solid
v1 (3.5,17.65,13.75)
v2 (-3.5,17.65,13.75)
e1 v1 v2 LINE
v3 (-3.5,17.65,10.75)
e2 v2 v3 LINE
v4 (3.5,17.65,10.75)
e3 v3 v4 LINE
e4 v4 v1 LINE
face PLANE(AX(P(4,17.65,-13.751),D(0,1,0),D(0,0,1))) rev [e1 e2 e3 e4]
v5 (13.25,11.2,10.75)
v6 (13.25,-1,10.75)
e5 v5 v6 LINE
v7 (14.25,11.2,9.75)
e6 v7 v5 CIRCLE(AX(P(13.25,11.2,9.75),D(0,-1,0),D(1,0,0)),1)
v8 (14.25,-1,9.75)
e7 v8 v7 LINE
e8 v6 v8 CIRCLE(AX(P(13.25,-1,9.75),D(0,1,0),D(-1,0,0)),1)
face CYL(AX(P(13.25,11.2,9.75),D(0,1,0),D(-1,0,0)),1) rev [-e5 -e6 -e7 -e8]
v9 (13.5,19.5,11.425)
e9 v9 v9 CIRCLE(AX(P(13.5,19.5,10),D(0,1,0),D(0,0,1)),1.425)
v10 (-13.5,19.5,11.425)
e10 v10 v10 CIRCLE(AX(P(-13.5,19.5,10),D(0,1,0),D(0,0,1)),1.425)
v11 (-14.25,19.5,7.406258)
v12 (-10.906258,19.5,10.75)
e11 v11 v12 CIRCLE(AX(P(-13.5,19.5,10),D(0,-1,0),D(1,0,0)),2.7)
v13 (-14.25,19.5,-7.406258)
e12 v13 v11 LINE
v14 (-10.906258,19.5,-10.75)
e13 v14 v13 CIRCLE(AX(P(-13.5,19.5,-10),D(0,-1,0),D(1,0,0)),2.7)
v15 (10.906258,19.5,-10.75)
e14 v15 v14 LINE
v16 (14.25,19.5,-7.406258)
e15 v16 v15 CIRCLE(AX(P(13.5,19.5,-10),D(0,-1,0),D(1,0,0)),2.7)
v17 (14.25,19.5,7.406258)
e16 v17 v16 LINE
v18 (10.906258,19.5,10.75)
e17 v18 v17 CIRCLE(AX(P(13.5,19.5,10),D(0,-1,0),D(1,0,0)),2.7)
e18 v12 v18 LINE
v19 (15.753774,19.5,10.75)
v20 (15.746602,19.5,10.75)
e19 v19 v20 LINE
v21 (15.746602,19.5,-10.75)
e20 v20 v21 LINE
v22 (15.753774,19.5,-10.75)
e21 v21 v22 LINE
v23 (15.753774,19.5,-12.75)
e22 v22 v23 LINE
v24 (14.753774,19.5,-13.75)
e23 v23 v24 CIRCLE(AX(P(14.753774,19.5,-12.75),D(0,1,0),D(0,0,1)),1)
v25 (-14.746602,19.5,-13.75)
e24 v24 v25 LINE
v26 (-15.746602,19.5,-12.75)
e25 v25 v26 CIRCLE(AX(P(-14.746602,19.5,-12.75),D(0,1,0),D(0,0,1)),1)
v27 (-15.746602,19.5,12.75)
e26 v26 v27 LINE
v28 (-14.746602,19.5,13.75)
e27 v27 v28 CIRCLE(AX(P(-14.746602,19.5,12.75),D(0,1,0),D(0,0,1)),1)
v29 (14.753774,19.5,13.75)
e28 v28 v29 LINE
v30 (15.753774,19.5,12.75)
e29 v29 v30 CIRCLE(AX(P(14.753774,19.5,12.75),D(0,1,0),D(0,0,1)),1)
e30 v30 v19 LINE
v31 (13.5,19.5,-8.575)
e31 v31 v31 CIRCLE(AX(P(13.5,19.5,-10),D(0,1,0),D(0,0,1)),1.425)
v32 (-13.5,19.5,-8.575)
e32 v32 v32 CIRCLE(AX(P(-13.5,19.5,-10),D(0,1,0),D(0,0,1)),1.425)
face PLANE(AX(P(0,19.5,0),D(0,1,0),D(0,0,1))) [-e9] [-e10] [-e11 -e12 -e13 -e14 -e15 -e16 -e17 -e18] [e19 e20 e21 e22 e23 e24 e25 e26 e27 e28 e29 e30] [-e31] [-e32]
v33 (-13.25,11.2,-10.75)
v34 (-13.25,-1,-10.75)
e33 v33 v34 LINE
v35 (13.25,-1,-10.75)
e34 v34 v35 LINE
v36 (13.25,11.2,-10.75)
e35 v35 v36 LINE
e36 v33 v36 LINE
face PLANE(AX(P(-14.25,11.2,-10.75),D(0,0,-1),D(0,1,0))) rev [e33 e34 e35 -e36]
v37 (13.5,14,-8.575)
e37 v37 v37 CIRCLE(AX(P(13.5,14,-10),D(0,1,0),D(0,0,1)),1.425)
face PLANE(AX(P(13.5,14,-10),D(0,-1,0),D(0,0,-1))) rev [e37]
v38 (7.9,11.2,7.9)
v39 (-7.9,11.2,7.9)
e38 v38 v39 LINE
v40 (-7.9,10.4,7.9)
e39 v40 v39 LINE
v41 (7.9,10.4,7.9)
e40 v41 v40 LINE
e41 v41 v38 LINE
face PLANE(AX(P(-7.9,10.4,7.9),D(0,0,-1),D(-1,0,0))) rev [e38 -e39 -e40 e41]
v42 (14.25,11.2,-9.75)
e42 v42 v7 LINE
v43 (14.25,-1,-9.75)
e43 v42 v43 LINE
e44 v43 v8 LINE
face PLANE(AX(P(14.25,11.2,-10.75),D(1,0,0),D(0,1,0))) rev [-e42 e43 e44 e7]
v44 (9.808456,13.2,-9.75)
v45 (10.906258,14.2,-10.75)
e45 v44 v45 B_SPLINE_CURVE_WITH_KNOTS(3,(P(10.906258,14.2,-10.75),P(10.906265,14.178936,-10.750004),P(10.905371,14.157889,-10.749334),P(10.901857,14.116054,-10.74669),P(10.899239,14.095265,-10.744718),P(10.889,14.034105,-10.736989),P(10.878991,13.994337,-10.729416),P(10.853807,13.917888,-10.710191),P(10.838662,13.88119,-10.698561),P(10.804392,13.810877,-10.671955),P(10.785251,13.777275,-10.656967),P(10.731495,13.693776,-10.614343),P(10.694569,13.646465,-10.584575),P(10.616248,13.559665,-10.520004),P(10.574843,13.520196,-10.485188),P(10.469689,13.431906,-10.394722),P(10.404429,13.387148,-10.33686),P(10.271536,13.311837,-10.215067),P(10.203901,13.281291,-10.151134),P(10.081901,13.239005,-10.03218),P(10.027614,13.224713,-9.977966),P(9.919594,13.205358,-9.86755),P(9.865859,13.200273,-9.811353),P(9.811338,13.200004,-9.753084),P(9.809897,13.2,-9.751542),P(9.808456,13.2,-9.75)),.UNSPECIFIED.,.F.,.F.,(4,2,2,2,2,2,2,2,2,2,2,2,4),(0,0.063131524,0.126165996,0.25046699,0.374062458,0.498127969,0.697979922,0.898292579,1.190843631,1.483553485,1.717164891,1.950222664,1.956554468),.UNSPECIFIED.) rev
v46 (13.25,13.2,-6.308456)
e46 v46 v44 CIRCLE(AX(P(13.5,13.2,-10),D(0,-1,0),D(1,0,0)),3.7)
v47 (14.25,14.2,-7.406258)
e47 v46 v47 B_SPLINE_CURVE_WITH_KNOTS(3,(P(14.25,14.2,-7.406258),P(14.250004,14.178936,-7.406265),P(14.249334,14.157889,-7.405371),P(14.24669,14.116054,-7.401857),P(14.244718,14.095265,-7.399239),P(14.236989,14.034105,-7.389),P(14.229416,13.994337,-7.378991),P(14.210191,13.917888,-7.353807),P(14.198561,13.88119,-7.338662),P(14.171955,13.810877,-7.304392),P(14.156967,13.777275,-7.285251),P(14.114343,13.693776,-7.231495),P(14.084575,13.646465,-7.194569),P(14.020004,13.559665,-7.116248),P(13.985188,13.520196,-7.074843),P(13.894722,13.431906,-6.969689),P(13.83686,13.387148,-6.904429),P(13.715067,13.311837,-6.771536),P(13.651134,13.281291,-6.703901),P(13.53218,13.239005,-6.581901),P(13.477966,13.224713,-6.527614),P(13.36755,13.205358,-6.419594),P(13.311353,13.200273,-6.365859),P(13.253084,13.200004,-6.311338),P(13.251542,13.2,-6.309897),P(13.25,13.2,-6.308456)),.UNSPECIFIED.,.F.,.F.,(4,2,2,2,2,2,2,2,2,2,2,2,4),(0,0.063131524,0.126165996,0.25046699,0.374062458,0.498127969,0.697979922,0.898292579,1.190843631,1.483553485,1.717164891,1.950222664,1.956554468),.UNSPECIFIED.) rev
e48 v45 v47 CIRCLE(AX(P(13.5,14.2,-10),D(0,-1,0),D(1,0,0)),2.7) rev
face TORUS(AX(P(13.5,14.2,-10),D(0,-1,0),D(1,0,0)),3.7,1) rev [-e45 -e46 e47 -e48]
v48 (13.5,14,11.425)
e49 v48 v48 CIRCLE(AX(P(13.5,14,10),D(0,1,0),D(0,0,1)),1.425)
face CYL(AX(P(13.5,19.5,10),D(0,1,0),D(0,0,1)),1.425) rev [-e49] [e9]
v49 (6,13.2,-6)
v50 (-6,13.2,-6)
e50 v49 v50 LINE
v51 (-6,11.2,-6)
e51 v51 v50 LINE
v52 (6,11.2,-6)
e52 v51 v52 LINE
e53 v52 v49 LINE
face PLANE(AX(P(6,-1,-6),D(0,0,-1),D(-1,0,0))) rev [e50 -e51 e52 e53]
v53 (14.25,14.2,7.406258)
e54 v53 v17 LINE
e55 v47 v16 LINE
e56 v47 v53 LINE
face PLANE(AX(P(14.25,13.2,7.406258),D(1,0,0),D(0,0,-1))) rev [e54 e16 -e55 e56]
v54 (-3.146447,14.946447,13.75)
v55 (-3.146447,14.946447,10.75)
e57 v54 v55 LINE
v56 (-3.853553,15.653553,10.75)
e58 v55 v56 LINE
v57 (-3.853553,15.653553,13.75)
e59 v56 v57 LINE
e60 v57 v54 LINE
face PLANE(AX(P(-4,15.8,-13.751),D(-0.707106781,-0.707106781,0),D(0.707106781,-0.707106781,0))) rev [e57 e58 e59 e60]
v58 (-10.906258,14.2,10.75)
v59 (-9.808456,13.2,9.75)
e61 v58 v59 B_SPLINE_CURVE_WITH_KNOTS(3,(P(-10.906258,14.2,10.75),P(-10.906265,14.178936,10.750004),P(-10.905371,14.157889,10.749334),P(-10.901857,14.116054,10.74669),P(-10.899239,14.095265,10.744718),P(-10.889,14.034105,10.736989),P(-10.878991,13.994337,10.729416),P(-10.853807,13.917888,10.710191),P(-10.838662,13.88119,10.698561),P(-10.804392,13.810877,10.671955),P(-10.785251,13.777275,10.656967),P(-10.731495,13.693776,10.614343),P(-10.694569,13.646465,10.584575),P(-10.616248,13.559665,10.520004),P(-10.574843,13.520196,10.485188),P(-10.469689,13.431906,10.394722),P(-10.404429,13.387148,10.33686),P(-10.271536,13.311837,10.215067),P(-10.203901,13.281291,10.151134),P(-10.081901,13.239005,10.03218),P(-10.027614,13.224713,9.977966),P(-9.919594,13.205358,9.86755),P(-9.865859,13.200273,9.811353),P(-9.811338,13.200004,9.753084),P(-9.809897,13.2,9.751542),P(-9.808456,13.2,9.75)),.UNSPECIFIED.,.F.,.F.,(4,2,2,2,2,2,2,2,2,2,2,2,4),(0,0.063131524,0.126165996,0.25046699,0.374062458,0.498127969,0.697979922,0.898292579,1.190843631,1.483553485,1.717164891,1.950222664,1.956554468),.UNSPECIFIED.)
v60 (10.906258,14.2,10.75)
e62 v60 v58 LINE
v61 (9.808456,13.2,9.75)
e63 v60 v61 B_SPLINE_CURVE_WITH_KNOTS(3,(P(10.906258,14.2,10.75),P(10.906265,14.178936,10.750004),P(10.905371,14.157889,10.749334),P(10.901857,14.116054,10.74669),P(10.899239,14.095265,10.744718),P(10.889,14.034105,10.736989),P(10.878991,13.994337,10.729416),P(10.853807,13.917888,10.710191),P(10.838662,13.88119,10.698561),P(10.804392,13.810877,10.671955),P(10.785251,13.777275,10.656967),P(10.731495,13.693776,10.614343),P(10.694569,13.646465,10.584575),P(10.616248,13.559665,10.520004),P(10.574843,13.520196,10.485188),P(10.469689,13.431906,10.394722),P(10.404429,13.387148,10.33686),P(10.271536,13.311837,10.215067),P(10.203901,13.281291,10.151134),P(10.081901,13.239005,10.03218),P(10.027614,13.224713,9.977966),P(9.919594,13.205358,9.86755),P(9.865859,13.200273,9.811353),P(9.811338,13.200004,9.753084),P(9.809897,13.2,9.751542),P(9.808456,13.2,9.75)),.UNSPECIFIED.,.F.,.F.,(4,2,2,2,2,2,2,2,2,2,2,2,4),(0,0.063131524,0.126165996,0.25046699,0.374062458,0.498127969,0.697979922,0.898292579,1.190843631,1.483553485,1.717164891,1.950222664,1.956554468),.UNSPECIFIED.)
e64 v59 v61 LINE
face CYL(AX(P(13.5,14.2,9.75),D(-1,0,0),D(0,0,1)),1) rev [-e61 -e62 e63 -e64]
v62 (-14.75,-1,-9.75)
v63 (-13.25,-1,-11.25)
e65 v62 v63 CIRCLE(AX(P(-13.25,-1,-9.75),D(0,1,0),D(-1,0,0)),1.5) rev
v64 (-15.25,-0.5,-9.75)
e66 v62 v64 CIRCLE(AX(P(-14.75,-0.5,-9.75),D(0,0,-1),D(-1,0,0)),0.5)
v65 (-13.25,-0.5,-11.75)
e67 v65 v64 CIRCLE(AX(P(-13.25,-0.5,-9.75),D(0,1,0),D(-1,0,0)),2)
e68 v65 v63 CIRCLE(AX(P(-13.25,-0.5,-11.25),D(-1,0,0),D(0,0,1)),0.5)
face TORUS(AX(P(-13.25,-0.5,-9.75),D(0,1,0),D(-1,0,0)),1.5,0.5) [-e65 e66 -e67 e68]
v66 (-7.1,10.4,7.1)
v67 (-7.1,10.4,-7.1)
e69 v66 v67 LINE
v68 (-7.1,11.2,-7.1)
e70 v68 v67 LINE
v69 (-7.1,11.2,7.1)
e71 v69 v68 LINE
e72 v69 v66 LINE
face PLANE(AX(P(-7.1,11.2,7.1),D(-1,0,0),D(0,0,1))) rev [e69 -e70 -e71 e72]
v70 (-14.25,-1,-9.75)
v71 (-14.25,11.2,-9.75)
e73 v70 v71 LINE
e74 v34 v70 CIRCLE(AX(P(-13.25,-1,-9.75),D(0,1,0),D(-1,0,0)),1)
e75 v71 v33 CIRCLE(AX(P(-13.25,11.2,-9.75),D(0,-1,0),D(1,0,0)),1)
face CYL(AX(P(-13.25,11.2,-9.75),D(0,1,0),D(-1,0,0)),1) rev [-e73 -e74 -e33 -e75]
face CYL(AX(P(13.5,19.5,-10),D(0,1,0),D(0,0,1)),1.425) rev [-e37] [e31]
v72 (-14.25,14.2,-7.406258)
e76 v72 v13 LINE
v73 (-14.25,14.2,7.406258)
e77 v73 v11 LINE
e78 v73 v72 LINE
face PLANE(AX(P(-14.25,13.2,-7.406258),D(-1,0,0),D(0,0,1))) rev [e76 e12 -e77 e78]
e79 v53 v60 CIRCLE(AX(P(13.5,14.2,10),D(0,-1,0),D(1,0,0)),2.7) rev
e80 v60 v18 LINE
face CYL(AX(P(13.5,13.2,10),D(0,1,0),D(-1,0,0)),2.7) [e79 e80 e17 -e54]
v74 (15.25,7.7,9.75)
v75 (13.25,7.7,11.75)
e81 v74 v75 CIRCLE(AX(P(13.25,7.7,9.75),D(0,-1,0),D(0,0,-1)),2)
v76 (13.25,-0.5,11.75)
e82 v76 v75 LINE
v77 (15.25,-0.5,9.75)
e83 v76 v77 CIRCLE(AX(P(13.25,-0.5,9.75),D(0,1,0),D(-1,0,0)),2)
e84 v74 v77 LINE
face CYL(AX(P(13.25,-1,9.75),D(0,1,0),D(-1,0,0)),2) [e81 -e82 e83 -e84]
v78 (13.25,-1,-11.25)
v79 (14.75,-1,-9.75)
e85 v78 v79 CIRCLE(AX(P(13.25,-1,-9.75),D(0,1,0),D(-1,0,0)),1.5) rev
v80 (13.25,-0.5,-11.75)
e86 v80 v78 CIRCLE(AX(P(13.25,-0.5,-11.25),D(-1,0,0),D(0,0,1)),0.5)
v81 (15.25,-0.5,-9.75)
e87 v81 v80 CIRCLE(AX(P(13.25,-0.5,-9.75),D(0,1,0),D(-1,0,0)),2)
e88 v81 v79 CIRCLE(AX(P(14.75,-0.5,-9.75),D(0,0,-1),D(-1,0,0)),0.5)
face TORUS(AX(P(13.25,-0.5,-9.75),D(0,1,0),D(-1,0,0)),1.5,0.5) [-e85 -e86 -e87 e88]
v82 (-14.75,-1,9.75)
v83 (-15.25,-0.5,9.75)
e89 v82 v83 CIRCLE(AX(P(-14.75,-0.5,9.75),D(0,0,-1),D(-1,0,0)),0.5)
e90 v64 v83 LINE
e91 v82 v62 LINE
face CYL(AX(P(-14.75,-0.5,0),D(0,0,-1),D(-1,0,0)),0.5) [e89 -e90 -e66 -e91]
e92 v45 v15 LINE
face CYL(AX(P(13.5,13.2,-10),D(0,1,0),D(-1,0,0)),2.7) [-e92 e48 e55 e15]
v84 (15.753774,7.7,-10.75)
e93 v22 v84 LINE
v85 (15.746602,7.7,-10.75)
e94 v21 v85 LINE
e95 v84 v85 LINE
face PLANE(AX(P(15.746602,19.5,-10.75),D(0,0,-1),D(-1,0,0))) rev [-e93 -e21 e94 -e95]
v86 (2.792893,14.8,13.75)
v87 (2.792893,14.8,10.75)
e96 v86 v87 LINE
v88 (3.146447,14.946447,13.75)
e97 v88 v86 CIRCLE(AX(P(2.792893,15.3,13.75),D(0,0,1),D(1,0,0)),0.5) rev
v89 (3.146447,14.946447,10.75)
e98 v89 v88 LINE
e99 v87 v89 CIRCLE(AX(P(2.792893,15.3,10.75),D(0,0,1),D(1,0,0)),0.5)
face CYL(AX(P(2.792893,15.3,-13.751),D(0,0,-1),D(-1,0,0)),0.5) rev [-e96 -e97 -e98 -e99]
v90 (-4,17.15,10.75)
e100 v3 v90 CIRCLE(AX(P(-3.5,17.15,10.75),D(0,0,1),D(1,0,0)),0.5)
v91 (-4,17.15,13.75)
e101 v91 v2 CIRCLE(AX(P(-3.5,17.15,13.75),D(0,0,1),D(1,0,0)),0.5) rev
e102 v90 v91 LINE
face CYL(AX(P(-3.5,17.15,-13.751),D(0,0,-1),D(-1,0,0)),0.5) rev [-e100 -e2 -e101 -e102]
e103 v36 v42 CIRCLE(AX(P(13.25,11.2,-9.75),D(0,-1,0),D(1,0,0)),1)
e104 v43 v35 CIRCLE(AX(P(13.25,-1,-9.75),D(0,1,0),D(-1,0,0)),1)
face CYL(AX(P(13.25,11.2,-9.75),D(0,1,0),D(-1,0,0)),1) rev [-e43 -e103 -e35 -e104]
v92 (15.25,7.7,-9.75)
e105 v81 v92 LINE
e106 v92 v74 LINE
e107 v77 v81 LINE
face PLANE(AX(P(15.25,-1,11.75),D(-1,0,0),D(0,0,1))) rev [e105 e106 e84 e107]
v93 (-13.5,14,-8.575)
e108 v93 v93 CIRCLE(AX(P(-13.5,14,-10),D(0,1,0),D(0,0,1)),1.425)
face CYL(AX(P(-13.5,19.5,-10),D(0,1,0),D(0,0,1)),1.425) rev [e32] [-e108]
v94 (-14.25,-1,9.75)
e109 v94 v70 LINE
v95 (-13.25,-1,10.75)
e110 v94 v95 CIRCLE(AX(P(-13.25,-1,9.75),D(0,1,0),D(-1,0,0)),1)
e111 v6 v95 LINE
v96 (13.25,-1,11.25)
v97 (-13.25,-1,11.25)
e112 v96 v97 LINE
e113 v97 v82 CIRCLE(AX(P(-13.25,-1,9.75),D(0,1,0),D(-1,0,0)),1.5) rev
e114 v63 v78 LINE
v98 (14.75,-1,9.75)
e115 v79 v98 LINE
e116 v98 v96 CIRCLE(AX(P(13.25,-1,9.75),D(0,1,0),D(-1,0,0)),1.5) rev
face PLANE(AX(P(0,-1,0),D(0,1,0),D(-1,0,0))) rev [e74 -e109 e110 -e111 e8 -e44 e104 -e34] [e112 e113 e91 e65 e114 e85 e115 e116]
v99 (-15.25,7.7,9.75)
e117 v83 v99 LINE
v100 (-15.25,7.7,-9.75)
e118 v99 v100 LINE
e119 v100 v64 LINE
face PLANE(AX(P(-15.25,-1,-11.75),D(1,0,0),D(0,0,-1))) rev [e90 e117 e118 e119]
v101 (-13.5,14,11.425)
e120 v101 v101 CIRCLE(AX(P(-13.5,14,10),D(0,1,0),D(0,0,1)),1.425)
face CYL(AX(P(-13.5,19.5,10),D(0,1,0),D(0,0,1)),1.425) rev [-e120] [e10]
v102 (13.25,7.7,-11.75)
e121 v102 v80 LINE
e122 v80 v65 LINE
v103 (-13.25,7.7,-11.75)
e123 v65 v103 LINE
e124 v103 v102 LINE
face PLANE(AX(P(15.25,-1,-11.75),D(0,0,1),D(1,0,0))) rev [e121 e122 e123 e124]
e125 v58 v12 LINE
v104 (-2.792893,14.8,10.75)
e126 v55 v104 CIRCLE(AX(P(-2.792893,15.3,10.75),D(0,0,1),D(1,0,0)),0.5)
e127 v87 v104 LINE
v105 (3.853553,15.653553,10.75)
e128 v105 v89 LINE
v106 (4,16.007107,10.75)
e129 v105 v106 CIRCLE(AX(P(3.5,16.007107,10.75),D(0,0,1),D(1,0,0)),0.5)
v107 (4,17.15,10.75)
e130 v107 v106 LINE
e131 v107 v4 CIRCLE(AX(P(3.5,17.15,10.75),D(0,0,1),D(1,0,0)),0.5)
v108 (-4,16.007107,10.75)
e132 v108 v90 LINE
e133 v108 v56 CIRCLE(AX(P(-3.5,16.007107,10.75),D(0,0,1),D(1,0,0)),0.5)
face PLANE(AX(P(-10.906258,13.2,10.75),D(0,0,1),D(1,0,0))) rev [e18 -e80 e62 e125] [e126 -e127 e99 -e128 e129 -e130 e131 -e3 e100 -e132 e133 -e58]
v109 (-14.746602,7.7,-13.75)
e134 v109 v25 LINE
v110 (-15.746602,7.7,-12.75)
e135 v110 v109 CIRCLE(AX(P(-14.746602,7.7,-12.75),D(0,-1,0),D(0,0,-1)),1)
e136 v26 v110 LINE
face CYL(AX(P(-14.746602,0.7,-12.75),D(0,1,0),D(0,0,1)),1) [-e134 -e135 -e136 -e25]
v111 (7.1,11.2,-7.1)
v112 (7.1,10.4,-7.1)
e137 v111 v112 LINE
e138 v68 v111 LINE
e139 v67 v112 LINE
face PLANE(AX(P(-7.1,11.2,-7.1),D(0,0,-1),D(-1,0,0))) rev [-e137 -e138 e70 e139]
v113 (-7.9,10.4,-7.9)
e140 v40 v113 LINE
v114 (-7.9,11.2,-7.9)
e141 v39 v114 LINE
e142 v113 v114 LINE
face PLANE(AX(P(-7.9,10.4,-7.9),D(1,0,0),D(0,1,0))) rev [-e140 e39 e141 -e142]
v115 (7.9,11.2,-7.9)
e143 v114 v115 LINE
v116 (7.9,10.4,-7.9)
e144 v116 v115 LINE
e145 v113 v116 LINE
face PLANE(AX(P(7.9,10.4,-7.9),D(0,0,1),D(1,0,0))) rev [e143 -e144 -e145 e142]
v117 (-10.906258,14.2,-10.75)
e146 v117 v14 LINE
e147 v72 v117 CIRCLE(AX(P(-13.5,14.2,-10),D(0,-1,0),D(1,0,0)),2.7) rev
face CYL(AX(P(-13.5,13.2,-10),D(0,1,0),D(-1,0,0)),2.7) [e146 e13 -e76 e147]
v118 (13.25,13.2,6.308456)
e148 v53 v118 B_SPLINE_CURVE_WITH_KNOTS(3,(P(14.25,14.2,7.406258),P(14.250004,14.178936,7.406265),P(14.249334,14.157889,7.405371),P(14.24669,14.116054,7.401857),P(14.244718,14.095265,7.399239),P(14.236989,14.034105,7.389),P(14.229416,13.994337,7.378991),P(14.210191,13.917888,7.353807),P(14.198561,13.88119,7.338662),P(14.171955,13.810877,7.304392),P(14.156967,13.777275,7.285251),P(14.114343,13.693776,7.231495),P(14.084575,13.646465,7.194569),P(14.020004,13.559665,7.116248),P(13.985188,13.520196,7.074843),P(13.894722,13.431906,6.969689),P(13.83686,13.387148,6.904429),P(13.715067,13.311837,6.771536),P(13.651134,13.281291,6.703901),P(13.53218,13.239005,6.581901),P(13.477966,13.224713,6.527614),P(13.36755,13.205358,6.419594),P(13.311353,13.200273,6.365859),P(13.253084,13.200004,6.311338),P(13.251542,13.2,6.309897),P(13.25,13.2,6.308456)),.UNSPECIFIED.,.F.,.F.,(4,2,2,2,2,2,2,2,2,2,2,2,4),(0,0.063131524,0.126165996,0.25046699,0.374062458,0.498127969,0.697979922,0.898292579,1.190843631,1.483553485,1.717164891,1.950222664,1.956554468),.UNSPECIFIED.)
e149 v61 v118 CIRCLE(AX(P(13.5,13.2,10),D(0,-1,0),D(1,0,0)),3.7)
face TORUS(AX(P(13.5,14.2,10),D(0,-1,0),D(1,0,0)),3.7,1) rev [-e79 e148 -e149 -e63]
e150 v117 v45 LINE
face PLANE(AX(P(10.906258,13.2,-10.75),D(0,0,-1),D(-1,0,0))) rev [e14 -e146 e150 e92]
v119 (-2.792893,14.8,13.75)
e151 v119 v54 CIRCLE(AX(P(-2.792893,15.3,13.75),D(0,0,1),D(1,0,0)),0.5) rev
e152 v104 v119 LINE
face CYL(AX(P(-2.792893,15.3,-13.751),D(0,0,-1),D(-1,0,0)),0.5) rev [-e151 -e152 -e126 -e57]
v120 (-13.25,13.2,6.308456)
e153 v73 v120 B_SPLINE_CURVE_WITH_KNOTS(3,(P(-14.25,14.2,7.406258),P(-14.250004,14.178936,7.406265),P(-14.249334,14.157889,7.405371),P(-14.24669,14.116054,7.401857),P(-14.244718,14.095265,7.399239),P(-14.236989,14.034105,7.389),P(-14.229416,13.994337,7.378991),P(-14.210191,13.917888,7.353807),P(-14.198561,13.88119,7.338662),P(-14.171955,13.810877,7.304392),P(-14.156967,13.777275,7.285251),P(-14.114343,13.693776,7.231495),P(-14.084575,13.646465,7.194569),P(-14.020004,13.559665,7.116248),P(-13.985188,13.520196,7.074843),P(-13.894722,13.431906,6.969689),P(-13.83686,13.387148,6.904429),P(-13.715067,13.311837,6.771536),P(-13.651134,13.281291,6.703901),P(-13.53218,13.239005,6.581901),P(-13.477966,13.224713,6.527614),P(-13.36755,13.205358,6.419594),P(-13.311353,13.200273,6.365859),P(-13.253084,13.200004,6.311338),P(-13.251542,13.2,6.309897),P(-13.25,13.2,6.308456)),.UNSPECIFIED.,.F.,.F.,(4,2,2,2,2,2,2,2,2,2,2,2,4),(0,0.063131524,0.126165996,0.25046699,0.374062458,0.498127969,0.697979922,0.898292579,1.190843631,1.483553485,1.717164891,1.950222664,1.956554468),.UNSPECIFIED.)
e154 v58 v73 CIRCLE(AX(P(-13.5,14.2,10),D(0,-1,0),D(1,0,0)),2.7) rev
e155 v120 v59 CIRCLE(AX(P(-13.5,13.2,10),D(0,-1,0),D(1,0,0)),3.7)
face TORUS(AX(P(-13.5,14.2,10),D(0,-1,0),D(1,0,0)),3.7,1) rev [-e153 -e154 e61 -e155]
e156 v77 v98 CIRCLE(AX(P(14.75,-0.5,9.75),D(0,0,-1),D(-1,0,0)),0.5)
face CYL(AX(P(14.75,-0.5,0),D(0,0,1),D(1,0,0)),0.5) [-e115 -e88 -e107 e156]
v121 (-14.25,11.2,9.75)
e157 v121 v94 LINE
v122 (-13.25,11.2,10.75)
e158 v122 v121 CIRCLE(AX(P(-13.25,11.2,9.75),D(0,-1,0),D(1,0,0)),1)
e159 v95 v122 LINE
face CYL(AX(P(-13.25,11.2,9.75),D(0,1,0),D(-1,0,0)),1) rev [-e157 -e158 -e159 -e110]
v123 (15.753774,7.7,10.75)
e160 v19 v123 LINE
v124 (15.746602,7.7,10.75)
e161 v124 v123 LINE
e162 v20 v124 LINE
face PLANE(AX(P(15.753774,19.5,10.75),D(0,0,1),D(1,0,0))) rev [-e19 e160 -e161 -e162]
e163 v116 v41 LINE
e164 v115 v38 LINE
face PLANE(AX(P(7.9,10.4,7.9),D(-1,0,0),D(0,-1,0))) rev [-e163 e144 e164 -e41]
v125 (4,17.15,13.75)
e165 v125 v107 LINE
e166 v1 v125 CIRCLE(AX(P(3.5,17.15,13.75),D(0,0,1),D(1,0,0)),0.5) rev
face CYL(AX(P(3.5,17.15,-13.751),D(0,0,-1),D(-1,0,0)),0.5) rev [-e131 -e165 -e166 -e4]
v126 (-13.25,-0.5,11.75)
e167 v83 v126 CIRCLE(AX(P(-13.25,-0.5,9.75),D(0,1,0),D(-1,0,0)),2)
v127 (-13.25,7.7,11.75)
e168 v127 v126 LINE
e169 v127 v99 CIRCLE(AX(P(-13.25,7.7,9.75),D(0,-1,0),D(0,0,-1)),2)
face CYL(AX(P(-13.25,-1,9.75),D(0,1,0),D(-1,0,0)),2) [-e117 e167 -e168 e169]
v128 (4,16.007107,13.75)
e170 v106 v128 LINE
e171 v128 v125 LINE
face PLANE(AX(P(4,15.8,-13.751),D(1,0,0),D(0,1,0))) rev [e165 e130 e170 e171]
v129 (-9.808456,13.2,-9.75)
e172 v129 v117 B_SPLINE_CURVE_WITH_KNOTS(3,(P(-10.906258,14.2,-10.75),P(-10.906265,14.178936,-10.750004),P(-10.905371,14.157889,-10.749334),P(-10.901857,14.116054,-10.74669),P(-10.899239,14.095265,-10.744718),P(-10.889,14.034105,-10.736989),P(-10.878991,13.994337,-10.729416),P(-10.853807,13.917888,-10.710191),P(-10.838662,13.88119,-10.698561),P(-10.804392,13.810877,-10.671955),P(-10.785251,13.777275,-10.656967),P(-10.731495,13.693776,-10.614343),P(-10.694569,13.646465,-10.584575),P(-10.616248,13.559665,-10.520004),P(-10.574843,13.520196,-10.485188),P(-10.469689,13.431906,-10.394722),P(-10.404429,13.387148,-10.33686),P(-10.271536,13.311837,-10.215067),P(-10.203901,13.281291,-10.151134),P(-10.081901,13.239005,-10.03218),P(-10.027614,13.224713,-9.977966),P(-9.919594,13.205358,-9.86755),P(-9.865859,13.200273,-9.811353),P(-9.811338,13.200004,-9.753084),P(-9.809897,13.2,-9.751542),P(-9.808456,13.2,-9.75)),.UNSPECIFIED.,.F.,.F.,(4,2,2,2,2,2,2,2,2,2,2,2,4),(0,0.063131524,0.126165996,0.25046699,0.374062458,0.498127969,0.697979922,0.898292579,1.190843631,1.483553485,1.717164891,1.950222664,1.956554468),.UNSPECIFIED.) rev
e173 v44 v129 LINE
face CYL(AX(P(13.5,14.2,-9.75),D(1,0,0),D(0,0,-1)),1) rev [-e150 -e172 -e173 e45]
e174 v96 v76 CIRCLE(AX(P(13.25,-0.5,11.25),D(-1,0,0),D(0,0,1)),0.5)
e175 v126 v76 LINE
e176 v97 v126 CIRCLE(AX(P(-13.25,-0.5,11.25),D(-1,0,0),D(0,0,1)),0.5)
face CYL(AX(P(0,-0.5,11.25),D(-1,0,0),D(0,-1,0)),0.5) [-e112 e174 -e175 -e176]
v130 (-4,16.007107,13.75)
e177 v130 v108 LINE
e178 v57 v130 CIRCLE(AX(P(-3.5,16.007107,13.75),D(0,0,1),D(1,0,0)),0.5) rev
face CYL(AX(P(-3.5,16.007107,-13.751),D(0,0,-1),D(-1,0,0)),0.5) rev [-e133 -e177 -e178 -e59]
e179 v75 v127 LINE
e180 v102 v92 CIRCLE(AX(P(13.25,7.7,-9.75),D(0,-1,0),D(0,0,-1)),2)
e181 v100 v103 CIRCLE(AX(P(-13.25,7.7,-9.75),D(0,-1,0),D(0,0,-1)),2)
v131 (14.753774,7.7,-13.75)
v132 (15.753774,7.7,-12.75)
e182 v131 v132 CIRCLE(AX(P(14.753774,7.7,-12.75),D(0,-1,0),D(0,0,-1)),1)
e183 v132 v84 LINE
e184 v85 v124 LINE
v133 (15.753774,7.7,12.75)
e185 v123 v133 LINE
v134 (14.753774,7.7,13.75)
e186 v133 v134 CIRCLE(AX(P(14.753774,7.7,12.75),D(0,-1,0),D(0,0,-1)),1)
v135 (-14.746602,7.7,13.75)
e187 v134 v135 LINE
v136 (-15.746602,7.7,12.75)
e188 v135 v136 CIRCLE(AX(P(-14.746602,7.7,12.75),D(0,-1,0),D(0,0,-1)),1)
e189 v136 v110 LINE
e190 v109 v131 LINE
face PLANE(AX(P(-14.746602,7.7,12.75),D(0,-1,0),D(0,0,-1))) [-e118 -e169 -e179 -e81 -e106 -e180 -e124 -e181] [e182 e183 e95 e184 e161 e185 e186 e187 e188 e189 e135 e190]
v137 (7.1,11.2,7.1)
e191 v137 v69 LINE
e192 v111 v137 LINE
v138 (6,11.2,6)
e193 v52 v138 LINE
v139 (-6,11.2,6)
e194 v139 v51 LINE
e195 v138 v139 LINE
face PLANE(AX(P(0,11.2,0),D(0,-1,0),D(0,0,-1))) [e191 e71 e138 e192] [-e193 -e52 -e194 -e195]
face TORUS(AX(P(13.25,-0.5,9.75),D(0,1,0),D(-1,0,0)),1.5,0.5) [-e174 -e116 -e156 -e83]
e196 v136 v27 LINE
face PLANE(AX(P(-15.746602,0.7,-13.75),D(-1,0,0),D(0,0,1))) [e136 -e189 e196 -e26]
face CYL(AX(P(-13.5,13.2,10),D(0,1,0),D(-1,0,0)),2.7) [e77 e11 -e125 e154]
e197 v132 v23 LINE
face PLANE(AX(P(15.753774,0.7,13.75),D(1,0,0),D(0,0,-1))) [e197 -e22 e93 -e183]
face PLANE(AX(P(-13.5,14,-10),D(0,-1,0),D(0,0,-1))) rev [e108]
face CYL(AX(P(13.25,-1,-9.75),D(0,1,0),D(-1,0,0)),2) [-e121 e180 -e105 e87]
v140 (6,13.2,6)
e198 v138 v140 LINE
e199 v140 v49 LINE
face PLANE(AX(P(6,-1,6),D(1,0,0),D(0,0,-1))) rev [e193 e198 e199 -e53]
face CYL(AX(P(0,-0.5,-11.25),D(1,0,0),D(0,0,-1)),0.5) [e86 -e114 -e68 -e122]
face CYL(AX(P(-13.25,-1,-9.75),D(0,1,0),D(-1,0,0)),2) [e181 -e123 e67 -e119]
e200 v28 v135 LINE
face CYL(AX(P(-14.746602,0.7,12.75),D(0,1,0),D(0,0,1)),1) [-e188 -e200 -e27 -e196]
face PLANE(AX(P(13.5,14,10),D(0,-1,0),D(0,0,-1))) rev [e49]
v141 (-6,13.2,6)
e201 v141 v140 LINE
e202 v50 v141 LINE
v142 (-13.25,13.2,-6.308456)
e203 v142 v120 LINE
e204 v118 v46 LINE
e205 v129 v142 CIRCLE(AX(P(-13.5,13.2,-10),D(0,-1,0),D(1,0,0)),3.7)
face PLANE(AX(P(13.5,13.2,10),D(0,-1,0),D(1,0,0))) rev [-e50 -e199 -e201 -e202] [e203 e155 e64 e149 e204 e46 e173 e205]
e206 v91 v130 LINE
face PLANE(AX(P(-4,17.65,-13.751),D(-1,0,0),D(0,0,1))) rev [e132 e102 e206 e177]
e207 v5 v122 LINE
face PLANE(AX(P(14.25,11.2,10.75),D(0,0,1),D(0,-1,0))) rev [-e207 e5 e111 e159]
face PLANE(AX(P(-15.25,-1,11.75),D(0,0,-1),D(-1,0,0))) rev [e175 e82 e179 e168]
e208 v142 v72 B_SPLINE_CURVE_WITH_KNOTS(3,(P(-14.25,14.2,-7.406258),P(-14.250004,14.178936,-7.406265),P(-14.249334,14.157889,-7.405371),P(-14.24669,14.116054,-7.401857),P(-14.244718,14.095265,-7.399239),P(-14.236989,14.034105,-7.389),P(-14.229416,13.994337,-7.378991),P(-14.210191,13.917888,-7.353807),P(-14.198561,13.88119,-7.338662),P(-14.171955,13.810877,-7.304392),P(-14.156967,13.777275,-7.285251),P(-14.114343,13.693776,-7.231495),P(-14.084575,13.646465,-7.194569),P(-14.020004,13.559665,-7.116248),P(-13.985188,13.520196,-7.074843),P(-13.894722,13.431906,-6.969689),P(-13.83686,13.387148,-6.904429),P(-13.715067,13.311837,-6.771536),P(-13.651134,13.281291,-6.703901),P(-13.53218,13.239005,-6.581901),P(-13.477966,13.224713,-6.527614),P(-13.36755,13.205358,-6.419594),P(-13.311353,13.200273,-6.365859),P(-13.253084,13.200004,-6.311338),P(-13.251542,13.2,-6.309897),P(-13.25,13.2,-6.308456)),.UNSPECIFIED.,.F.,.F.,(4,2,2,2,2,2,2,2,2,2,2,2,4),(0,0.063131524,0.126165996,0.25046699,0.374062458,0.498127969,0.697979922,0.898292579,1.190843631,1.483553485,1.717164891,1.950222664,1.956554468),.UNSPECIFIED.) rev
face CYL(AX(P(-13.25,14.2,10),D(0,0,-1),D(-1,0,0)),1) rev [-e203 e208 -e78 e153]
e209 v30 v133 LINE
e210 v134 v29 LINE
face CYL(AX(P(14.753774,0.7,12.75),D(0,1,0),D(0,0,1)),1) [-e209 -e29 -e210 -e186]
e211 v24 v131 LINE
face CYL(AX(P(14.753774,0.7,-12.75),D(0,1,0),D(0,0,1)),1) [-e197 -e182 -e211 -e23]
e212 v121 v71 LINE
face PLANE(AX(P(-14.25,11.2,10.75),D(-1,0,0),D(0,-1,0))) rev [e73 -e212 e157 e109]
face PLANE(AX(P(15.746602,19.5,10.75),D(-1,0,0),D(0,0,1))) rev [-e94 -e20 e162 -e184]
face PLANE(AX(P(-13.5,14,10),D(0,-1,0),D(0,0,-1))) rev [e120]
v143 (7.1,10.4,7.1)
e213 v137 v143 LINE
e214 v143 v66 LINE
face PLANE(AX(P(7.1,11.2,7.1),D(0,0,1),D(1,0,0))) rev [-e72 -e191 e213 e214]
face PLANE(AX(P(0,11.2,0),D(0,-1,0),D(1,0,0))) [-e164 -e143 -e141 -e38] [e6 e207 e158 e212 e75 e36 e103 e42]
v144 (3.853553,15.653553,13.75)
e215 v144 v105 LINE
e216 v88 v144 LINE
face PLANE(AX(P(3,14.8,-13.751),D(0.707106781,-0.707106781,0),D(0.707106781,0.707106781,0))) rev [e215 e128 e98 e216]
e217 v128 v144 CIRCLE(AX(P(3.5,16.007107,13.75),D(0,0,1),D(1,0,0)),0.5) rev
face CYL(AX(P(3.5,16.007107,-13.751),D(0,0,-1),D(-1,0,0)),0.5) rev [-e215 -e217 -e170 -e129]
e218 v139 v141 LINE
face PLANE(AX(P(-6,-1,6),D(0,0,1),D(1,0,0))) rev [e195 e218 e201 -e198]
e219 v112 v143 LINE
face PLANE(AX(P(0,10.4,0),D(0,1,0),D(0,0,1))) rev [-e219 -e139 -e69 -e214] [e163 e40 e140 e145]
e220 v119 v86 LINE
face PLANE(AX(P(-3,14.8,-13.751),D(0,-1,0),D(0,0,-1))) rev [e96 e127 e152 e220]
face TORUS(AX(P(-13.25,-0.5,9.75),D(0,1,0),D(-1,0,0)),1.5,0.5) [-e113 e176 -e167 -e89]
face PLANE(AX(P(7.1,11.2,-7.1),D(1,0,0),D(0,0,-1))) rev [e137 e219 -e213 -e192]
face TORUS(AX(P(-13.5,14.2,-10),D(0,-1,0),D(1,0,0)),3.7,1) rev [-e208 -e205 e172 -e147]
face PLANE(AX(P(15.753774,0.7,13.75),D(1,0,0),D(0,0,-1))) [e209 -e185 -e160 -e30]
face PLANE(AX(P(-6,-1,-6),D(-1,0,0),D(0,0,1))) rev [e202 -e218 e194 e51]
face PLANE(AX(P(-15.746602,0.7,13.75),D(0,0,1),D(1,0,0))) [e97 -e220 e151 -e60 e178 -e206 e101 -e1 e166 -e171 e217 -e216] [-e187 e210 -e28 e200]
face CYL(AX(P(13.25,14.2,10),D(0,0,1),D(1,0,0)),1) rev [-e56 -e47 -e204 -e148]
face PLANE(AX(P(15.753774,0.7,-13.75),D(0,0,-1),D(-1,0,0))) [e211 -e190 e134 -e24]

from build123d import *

# Parameters (mm, degrees)
SKETCH_1_W               = 31.500375693
SKETCH_1_H               = 27.5
EXTRUDE_1_DEPTH          = 18.8
SKETCH_2_W               = 0.007172267
SKETCH_2_H               = 21.5
CUT_EXTRUDE_1_DEPTH      = 18.8
SKETCH_3_W               = 30.5
SKETCH_3_H               = 23.5
EXTRUDE_2_DEPTH          = 1.7
SKETCH_4_W               = 28.5
SKETCH_4_H               = 21.5
CUT_EXTRUDE_2_DEPTH      = 12.2
SKETCH_5_W               = 15.8
SKETCH_5_H               = 15.8
EXTRUDE_3_DEPTH          = 0.8
CUT_EXTRUDE_3_DEPTH      = 6.3
SKETCH_7_W               = 14.2
SKETCH_7_H               = 14.2
CUT_EXTRUDE_4_DEPTH      = 0.8
SKETCH_8_W               = 12
SKETCH_8_H               = 12
CUT_EXTRUDE_5_DEPTH      = 26.276152686
CUT_EXTRUDE_6_REACH      = 39.211
HOLE_WIZARD_M2_5_1_D     = 2.85
HOLE_WIZARD_M2_5_1_DEPTH = 5.5
FILLET_1_R               = 2
FILLET_2_R               = 0.5
FILLET_3_R               = 1
CUT_EXTRUDE_8_DEPTH      = 7


with BuildPart() as part:
    # 草图1 → 凸台-拉伸1 (new body)
    with BuildSketch(Plane(origin=(0, 19.5, 0), x_dir=(1, 0, 0), z_dir=(0, 1, 0))):
        with Locations((0.003586134, 0)):
            Rectangle(SKETCH_1_W, SKETCH_1_H)
    extrude(amount=-EXTRUDE_1_DEPTH)

    # 草图2 → 切除-拉伸1 (cut)
    with BuildSketch(Plane.XZ.offset(-0.7)):
        with Locations((15.750187847, 0)):
            Rectangle(SKETCH_2_W, SKETCH_2_H)
    extrude(amount=-CUT_EXTRUDE_1_DEPTH, mode=Mode.SUBTRACT)

    # 草图3 → 凸台-拉伸2 (add)
    with BuildSketch(Plane.XZ.offset(-0.7)):
        Rectangle(SKETCH_3_W, SKETCH_3_H)
    extrude(amount=EXTRUDE_2_DEPTH)

    # 草图4 → 切除-拉伸2 (cut)
    with BuildSketch(Plane.XZ.offset(1)):
        Rectangle(SKETCH_4_W, SKETCH_4_H)
    extrude(amount=-CUT_EXTRUDE_2_DEPTH, mode=Mode.SUBTRACT)

    # 草图5 → 凸台-拉伸3 (add)
    with BuildSketch(Plane.XZ.offset(-11.2)):
        Rectangle(SKETCH_5_W, SKETCH_5_H)
    extrude(amount=EXTRUDE_3_DEPTH)

    # 草图6 → 切除-拉伸3 (cut)
    with BuildSketch(Plane(origin=(0, 19.5, 0), x_dir=(-1, 0, 0), z_dir=(0, 1, 0))):
        with BuildLine():
            Line((-14.25, 7.40625753), (-14.25, -7.40625753))
            ThreePointArc((-14.25, -7.40625753), (-11.590811691, -8.090811691), (-10.90625753, -10.75))
            Line((-10.90625753, -10.75), (10.90625753, -10.75))
            ThreePointArc((10.90625753, -10.75), (11.590811691, -8.090811691), (14.25, -7.40625753))
            Line((14.25, -7.40625753), (14.25, 7.40625753))
            ThreePointArc((14.25, 7.40625753), (11.590811691, 8.090811691), (10.90625753, 10.75))
            Line((10.90625753, 10.75), (-10.90625753, 10.75))
            ThreePointArc((-10.90625753, 10.75), (-11.590811691, 8.090811691), (-14.25, 7.40625753))
        make_face()
    extrude(amount=-CUT_EXTRUDE_3_DEPTH, mode=Mode.SUBTRACT)

    # 草图7 → 切除-拉伸4 (cut)
    with BuildSketch(Plane.XZ.offset(-10.4)):
        Rectangle(SKETCH_7_W, SKETCH_7_H)
    extrude(amount=-CUT_EXTRUDE_4_DEPTH, mode=Mode.SUBTRACT)

    # 草图8 → 切除-拉伸5 (cut, through all)
    with BuildSketch(Plane(origin=(0, 13.2, 0), x_dir=(-1, 0, 0), z_dir=(0, 1, 0))):
        Rectangle(SKETCH_8_W, SKETCH_8_H)
    extrude(amount=-CUT_EXTRUDE_5_DEPTH, mode=Mode.SUBTRACT)

    # 草图9 → 切除-拉伸6 (cut, up to next)
    with BuildSketch(Plane.XY.offset(13.75), mode=Mode.PRIVATE) as cut_extrude_6_sk1:
        Polygon((-4, 17.65), (-4, 15.8), (-3, 14.8), (3, 14.8), (4, 15.8), (4, 17.65), align=None)
    cut_extrude_6_tool1 = extrude(cut_extrude_6_sk1.sketch, amount=-CUT_EXTRUDE_6_REACH, mode=Mode.PRIVATE) & part.part
    add(cut_extrude_6_tool1.solids().sort_by_distance((0, 16.275076, 13.75))[0], mode=Mode.SUBTRACT)

    # M2.5 间隙孔1
    with Locations(Plane(origin=(0, 19.5, 0), x_dir=(1, 0, 0), z_dir=(0, 1, 0))):
        with Locations((13.5, 10), (13.5, -10), (-13.5, -10), (-13.5, 10)):
            Hole(HOLE_WIZARD_M2_5_1_D / 2, depth=HOLE_WIZARD_M2_5_1_DEPTH)

    # 圆角1
    fillet_1_edges = [part.edges().sort_by_distance(p)[0] for p in [
        (15.25, -0.15, -11.75),
        (15.25, -0.15, 11.75),
        (-15.25, -0.15, 11.75),
        (-15.25, -0.15, -11.75),
    ]]
    fillet(fillet_1_edges, radius=FILLET_1_R)

    # 圆角2
    fillet_2_edges = [part.edges().sort_by_distance(p)[0] for p in [
        (-4, 17.65, 12.25),
        (4, 17.65, 12.25),
        (4, 15.8, 12.25),
        (3, 14.8, 12.25),
        (-3, 14.8, 12.25),
        (-4, 15.8, 12.25),
        (-15.25, -1, 0),
        (0, -1, 11.75),
        (15.25, -1, 0),
        (0, -1, -11.75),
        (14.664213562, -1, -11.164213562),
        (-14.664213562, -1, -11.164213562),
        (14.664213562, -1, 11.164213562),
        (-14.664213562, -1, 11.164213562),
    ]]
    fillet(fillet_2_edges, radius=FILLET_2_R)

    # 圆角3
    # the kernel refuses this fillet: 1 mm, written as the material it adds along each edge
    with BuildSketch(Plane(origin=(-14.25, -1, 10.75), x_dir=(1, 0, 0), z_dir=(0, 1, 0))) as fillet_3_piece_1:
        with BuildLine():
            CenterArc((FILLET_3_R, FILLET_3_R), FILLET_3_R, 180, 90)
            Line((0, FILLET_3_R), (0, 0))
            Line((0, 0), (FILLET_3_R, 0))
        make_face()
    extrude(amount=14.7)
    with BuildSketch(Plane(origin=(14.25, -1, 10.75), x_dir=(-1, 0, 0), z_dir=(0, 1, 0)), Plane(origin=(14.25, -1, -10.75), x_dir=(0, 0, 1), z_dir=(0, 1, 0)), Plane(origin=(-14.25, -1, -10.75), x_dir=(1, 0, 0), z_dir=(0, 1, 0))) as fillet_3_piece_2:
        with BuildLine():
            CenterArc((FILLET_3_R, -FILLET_3_R), FILLET_3_R, 90, 90)
            Line((0, -FILLET_3_R), (0, 0))
            Line((0, 0), (FILLET_3_R, 0))
        make_face()
    extrude(amount=14.7)
    with BuildSketch(Plane(origin=(13.5, 13.2, 10), x_dir=(-0.3548034469093428, 0, 0.9349409147434126), z_dir=(0.9349409147434126, 0, 0.3548034469093428))) as fillet_3_piece_3_section:
        with BuildLine():
            CenterArc((2.7 + FILLET_3_R, -FILLET_3_R), FILLET_3_R, 90, 90)
            Line((2.7 + FILLET_3_R, 0), (2.7, 0))
            Line((2.7, 0), (2.7, -FILLET_3_R))
        make_face()
    fillet_3_piece_3 = revolve(axis=Axis((13.5, 13.2, 10), (0, -1, 0)), revolution_arc=228.43720284, mode=Mode.PRIVATE)
    fillet_3_piece_3 = split(fillet_3_piece_3, bisect_by=Plane(origin=(14.25, 13.485154119, 7.889177279), z_dir=(-1, 0, 0)), keep=Keep.TOP, mode=Mode.PRIVATE)
    add(fillet_3_piece_3)
    with BuildSketch(Plane(origin=(-13.40625753, 13.2, 10.75), x_dir=(0, 1, 0), z_dir=(1, 0, 0))) as fillet_3_piece_4_section:
        with BuildLine():
            CenterArc((FILLET_3_R, -FILLET_3_R), FILLET_3_R, 90, 90)
            Line((0, -FILLET_3_R), (0, 0))
            Line((0, 0), (FILLET_3_R, 0))
        make_face()
    fillet_3_piece_4 = extrude(amount=26.81251506, mode=Mode.PRIVATE)
    fillet_3_piece_4 = fillet_3_piece_4 - Plane(origin=(13.5, 14.049901013, 10), x_dir=(-0.9606453592105874, 0, 0.27777777777777996), z_dir=(0, 1, 0)) * Cylinder(2.7, 58, mode=Mode.PRIVATE)
    fillet_3_piece_4 = fillet_3_piece_4 - Plane(origin=(-13.5, 14.049901013, 10), x_dir=(-0.2777777777777764, 0, -0.9606453592105884), z_dir=(0, 1, 0)) * Cylinder(2.7, 58, mode=Mode.PRIVATE)
    add(fillet_3_piece_4)
    with BuildSketch(Plane(origin=(-13.5, 13.2, 10), x_dir=(-0.9349409147434112, 0, -0.35480344690934623), z_dir=(-0.35480344690934623, 0, 0.9349409147434112))) as fillet_3_piece_5_section:
        with BuildLine():
            CenterArc((2.7 + FILLET_3_R, -FILLET_3_R), FILLET_3_R, 90, 90)
            Line((2.7 + FILLET_3_R, 0), (2.7, 0))
            Line((2.7, 0), (2.7, -FILLET_3_R))
        make_face()
    fillet_3_piece_5 = revolve(axis=Axis((-13.5, 13.2, 10), (0, -1, 0)), revolution_arc=228.43720284, mode=Mode.PRIVATE)
    fillet_3_piece_5 = split(fillet_3_piece_5, bisect_by=Plane(origin=(-14.25, 13.485154119, 7.889177279), z_dir=(1, 0, 0)), keep=Keep.TOP, mode=Mode.PRIVATE)
    add(fillet_3_piece_5)
    with BuildSketch(Plane(origin=(-14.25, 13.2, -9.90625753), x_dir=(0, 1, 0), z_dir=(0, 0, 1))) as fillet_3_piece_6_section:
        with BuildLine():
            CenterArc((FILLET_3_R, -FILLET_3_R), FILLET_3_R, 90, 90)
            Line((0, -FILLET_3_R), (0, 0))
            Line((0, 0), (FILLET_3_R, 0))
        make_face()
    fillet_3_piece_6 = extrude(amount=19.81251506, mode=Mode.PRIVATE)
    fillet_3_piece_6 = fillet_3_piece_6 - Plane(origin=(-13.5, 14.049902267, 10), x_dir=(-0.2777777777777764, 0, -0.9606453592105884), z_dir=(0, 1, 0)) * Cylinder(2.7, 44, mode=Mode.PRIVATE)
    fillet_3_piece_6 = fillet_3_piece_6 - Plane(origin=(-13.5, 14.049902267, -10), x_dir=(-1, 0, 0), z_dir=(0, -1, 0)) * Cylinder(1.425, 44, mode=Mode.PRIVATE)
    add(fillet_3_piece_6)
    with BuildSketch(Plane(origin=(-13.5, 13.2, -10), x_dir=(0.35480344690934373, 0, -0.9349409147434123), z_dir=(-0.9349409147434123, 0, -0.35480344690934373))) as fillet_3_piece_7_section:
        with BuildLine():
            CenterArc((2.7 + FILLET_3_R, -FILLET_3_R), FILLET_3_R, 90, 90)
            Line((2.7 + FILLET_3_R, 0), (2.7, 0))
            Line((2.7, 0), (2.7, -FILLET_3_R))
        make_face()
    fillet_3_piece_7 = revolve(axis=Axis((-13.5, 13.2, -10), (0, -1, 0)), revolution_arc=228.43720284, mode=Mode.PRIVATE)
    fillet_3_piece_7 = split(fillet_3_piece_7, bisect_by=Plane(origin=(-14.25, 13.485154119, -7.889177279), z_dir=(1, 0, 0)), keep=Keep.TOP, mode=Mode.PRIVATE)
    add(fillet_3_piece_7)
    with BuildSketch(Plane(origin=(13.40625753, 13.2, -10.75), x_dir=(0, 1, 0), z_dir=(-1, 0, 0))) as fillet_3_piece_8_section:
        with BuildLine():
            CenterArc((FILLET_3_R, -FILLET_3_R), FILLET_3_R, 90, 90)
            Line((0, -FILLET_3_R), (0, 0))
            Line((0, 0), (FILLET_3_R, 0))
        make_face()
    fillet_3_piece_8 = extrude(amount=26.81251506, mode=Mode.PRIVATE)
    fillet_3_piece_8 = fillet_3_piece_8 - Plane(origin=(-13.5, 14.049901014, -10), x_dir=(-1, 0, 0), z_dir=(0, -1, 0)) * Cylinder(1.425, 58, mode=Mode.PRIVATE)
    fillet_3_piece_8 = fillet_3_piece_8 - Plane(origin=(13.5, 14.049901014, -10), x_dir=(-1, 0, 0), z_dir=(0, -1, 0)) * Cylinder(1.425, 58, mode=Mode.PRIVATE)
    add(fillet_3_piece_8)
    with BuildSketch(Plane(origin=(13.5, 13.2, -10), x_dir=(0.9349409147434106, 0, 0.3548034469093482), z_dir=(0.3548034469093482, 0, -0.9349409147434106))) as fillet_3_piece_9_section:
        with BuildLine():
            CenterArc((2.7 + FILLET_3_R, -FILLET_3_R), FILLET_3_R, 90, 90)
            Line((2.7 + FILLET_3_R, 0), (2.7, 0))
            Line((2.7, 0), (2.7, -FILLET_3_R))
        make_face()
    fillet_3_piece_9 = revolve(axis=Axis((13.5, 13.2, -10), (0, -1, 0)), revolution_arc=228.43720284, mode=Mode.PRIVATE)
    fillet_3_piece_9 = split(fillet_3_piece_9, bisect_by=Plane(origin=(14.25, 13.485154119, -7.889177279), z_dir=(-1, 0, 0)), keep=Keep.TOP, mode=Mode.PRIVATE)
    add(fillet_3_piece_9)
    with BuildSketch(Plane(origin=(14.25, 13.2, 9.90625753), x_dir=(0, 1, 0), z_dir=(0, 0, -1))) as fillet_3_piece_10_section:
        with BuildLine():
            CenterArc((FILLET_3_R, -FILLET_3_R), FILLET_3_R, 90, 90)
            Line((0, -FILLET_3_R), (0, 0))
            Line((0, 0), (FILLET_3_R, 0))
        make_face()
    fillet_3_piece_10 = extrude(amount=19.81251506, mode=Mode.PRIVATE)
    fillet_3_piece_10 = fillet_3_piece_10 - Plane(origin=(13.5, 14.049902266, 10), x_dir=(-0.9606453592105874, 0, 0.27777777777777996), z_dir=(0, 1, 0)) * Cylinder(2.7, 44, mode=Mode.PRIVATE)
    fillet_3_piece_10 = fillet_3_piece_10 - Plane(origin=(13.5, 14.049902266, -10), x_dir=(-1, 0, 0), z_dir=(0, -1, 0)) * Cylinder(1.425, 44, mode=Mode.PRIVATE)
    add(fillet_3_piece_10)
    # the kernel refuses this fillet: 1 mm, written as the material it takes off along each edge
    with BuildSketch(Plane(origin=(15.75377398, 22, -13.75), x_dir=(0, 0, 1), z_dir=(0, -1, 0)), Plane(origin=(15.75377398, 22, 13.75), x_dir=(-1, 0, 0), z_dir=(0, -1, 0)), Plane(origin=(-15.746601713, 22, -13.75), x_dir=(1, 0, 0), z_dir=(0, -1, 0))) as fillet_3_2_piece_1:
        with BuildLine():
            CenterArc((FILLET_3_R, FILLET_3_R), FILLET_3_R, 180, 90)
            Line((0, FILLET_3_R), (0, 0))
            Line((0, 0), (FILLET_3_R, 0))
        make_face()
    extrude(amount=23.8, mode=Mode.SUBTRACT)
    with BuildSketch(Plane(origin=(-15.746601713, 22, 13.75), x_dir=(1, 0, 0), z_dir=(0, -1, 0))) as fillet_3_2_piece_2:
        with BuildLine():
            CenterArc((FILLET_3_R, -FILLET_3_R), FILLET_3_R, 90, 90)
            Line((0, -FILLET_3_R), (0, 0))
            Line((0, 0), (FILLET_3_R, 0))
        make_face()
    extrude(amount=23.8, mode=Mode.SUBTRACT)

    # 草图12 → 切除-拉伸8 (cut)
    with BuildSketch(Plane.XZ.offset(-0.7)):
        with BuildLine():
            Line((-15.746601713, 12.75), (-15.746601713, -12.75))
            ThreePointArc((-15.746601713, -12.75), (-15.453708494, -13.457106781), (-14.746601713, -13.75))
            Line((-14.746601713, -13.75), (14.75377398, -13.75))
            ThreePointArc((14.75377398, -13.75), (15.460880761, -13.457106781), (15.75377398, -12.75))
            Line((15.75377398, -12.75), (15.75377398, -10.75))
            Line((15.75377398, -10.75), (15.746601713, -10.75))
            Line((15.746601713, -10.75), (15.746601713, 10.75))
            Line((15.746601713, 10.75), (15.75377398, 10.75))
            Line((15.75377398, 10.75), (15.75377398, 12.75))
            ThreePointArc((15.75377398, 12.75), (15.460880761, 13.457106781), (14.75377398, 13.75))
            Line((14.75377398, 13.75), (-14.746601713, 13.75))
            ThreePointArc((-14.746601713, 13.75), (-15.453708494, 13.457106781), (-15.746601713, 12.75))
        make_face()
        with BuildLine():
            Line((15.25, -9.75), (15.25, 9.75))
            ThreePointArc((15.25, 9.75), (14.664213562, 11.164213562), (13.25, 11.75))
            Line((13.25, 11.75), (-13.25, 11.75))
            ThreePointArc((-13.25, 11.75), (-14.664213562, 11.164213562), (-15.25, 9.75))
            Line((-15.25, 9.75), (-15.25, -9.75))
            ThreePointArc((-15.25, -9.75), (-14.664213562, -11.164213562), (-13.25, -11.75))
            Line((-13.25, -11.75), (13.25, -11.75))
            ThreePointArc((13.25, -11.75), (14.664213562, -11.164213562), (15.25, -9.75))
        make_face(mode=Mode.SUBTRACT)
    extrude(amount=-CUT_EXTRUDE_8_DEPTH, mode=Mode.SUBTRACT)


solid = part.part
